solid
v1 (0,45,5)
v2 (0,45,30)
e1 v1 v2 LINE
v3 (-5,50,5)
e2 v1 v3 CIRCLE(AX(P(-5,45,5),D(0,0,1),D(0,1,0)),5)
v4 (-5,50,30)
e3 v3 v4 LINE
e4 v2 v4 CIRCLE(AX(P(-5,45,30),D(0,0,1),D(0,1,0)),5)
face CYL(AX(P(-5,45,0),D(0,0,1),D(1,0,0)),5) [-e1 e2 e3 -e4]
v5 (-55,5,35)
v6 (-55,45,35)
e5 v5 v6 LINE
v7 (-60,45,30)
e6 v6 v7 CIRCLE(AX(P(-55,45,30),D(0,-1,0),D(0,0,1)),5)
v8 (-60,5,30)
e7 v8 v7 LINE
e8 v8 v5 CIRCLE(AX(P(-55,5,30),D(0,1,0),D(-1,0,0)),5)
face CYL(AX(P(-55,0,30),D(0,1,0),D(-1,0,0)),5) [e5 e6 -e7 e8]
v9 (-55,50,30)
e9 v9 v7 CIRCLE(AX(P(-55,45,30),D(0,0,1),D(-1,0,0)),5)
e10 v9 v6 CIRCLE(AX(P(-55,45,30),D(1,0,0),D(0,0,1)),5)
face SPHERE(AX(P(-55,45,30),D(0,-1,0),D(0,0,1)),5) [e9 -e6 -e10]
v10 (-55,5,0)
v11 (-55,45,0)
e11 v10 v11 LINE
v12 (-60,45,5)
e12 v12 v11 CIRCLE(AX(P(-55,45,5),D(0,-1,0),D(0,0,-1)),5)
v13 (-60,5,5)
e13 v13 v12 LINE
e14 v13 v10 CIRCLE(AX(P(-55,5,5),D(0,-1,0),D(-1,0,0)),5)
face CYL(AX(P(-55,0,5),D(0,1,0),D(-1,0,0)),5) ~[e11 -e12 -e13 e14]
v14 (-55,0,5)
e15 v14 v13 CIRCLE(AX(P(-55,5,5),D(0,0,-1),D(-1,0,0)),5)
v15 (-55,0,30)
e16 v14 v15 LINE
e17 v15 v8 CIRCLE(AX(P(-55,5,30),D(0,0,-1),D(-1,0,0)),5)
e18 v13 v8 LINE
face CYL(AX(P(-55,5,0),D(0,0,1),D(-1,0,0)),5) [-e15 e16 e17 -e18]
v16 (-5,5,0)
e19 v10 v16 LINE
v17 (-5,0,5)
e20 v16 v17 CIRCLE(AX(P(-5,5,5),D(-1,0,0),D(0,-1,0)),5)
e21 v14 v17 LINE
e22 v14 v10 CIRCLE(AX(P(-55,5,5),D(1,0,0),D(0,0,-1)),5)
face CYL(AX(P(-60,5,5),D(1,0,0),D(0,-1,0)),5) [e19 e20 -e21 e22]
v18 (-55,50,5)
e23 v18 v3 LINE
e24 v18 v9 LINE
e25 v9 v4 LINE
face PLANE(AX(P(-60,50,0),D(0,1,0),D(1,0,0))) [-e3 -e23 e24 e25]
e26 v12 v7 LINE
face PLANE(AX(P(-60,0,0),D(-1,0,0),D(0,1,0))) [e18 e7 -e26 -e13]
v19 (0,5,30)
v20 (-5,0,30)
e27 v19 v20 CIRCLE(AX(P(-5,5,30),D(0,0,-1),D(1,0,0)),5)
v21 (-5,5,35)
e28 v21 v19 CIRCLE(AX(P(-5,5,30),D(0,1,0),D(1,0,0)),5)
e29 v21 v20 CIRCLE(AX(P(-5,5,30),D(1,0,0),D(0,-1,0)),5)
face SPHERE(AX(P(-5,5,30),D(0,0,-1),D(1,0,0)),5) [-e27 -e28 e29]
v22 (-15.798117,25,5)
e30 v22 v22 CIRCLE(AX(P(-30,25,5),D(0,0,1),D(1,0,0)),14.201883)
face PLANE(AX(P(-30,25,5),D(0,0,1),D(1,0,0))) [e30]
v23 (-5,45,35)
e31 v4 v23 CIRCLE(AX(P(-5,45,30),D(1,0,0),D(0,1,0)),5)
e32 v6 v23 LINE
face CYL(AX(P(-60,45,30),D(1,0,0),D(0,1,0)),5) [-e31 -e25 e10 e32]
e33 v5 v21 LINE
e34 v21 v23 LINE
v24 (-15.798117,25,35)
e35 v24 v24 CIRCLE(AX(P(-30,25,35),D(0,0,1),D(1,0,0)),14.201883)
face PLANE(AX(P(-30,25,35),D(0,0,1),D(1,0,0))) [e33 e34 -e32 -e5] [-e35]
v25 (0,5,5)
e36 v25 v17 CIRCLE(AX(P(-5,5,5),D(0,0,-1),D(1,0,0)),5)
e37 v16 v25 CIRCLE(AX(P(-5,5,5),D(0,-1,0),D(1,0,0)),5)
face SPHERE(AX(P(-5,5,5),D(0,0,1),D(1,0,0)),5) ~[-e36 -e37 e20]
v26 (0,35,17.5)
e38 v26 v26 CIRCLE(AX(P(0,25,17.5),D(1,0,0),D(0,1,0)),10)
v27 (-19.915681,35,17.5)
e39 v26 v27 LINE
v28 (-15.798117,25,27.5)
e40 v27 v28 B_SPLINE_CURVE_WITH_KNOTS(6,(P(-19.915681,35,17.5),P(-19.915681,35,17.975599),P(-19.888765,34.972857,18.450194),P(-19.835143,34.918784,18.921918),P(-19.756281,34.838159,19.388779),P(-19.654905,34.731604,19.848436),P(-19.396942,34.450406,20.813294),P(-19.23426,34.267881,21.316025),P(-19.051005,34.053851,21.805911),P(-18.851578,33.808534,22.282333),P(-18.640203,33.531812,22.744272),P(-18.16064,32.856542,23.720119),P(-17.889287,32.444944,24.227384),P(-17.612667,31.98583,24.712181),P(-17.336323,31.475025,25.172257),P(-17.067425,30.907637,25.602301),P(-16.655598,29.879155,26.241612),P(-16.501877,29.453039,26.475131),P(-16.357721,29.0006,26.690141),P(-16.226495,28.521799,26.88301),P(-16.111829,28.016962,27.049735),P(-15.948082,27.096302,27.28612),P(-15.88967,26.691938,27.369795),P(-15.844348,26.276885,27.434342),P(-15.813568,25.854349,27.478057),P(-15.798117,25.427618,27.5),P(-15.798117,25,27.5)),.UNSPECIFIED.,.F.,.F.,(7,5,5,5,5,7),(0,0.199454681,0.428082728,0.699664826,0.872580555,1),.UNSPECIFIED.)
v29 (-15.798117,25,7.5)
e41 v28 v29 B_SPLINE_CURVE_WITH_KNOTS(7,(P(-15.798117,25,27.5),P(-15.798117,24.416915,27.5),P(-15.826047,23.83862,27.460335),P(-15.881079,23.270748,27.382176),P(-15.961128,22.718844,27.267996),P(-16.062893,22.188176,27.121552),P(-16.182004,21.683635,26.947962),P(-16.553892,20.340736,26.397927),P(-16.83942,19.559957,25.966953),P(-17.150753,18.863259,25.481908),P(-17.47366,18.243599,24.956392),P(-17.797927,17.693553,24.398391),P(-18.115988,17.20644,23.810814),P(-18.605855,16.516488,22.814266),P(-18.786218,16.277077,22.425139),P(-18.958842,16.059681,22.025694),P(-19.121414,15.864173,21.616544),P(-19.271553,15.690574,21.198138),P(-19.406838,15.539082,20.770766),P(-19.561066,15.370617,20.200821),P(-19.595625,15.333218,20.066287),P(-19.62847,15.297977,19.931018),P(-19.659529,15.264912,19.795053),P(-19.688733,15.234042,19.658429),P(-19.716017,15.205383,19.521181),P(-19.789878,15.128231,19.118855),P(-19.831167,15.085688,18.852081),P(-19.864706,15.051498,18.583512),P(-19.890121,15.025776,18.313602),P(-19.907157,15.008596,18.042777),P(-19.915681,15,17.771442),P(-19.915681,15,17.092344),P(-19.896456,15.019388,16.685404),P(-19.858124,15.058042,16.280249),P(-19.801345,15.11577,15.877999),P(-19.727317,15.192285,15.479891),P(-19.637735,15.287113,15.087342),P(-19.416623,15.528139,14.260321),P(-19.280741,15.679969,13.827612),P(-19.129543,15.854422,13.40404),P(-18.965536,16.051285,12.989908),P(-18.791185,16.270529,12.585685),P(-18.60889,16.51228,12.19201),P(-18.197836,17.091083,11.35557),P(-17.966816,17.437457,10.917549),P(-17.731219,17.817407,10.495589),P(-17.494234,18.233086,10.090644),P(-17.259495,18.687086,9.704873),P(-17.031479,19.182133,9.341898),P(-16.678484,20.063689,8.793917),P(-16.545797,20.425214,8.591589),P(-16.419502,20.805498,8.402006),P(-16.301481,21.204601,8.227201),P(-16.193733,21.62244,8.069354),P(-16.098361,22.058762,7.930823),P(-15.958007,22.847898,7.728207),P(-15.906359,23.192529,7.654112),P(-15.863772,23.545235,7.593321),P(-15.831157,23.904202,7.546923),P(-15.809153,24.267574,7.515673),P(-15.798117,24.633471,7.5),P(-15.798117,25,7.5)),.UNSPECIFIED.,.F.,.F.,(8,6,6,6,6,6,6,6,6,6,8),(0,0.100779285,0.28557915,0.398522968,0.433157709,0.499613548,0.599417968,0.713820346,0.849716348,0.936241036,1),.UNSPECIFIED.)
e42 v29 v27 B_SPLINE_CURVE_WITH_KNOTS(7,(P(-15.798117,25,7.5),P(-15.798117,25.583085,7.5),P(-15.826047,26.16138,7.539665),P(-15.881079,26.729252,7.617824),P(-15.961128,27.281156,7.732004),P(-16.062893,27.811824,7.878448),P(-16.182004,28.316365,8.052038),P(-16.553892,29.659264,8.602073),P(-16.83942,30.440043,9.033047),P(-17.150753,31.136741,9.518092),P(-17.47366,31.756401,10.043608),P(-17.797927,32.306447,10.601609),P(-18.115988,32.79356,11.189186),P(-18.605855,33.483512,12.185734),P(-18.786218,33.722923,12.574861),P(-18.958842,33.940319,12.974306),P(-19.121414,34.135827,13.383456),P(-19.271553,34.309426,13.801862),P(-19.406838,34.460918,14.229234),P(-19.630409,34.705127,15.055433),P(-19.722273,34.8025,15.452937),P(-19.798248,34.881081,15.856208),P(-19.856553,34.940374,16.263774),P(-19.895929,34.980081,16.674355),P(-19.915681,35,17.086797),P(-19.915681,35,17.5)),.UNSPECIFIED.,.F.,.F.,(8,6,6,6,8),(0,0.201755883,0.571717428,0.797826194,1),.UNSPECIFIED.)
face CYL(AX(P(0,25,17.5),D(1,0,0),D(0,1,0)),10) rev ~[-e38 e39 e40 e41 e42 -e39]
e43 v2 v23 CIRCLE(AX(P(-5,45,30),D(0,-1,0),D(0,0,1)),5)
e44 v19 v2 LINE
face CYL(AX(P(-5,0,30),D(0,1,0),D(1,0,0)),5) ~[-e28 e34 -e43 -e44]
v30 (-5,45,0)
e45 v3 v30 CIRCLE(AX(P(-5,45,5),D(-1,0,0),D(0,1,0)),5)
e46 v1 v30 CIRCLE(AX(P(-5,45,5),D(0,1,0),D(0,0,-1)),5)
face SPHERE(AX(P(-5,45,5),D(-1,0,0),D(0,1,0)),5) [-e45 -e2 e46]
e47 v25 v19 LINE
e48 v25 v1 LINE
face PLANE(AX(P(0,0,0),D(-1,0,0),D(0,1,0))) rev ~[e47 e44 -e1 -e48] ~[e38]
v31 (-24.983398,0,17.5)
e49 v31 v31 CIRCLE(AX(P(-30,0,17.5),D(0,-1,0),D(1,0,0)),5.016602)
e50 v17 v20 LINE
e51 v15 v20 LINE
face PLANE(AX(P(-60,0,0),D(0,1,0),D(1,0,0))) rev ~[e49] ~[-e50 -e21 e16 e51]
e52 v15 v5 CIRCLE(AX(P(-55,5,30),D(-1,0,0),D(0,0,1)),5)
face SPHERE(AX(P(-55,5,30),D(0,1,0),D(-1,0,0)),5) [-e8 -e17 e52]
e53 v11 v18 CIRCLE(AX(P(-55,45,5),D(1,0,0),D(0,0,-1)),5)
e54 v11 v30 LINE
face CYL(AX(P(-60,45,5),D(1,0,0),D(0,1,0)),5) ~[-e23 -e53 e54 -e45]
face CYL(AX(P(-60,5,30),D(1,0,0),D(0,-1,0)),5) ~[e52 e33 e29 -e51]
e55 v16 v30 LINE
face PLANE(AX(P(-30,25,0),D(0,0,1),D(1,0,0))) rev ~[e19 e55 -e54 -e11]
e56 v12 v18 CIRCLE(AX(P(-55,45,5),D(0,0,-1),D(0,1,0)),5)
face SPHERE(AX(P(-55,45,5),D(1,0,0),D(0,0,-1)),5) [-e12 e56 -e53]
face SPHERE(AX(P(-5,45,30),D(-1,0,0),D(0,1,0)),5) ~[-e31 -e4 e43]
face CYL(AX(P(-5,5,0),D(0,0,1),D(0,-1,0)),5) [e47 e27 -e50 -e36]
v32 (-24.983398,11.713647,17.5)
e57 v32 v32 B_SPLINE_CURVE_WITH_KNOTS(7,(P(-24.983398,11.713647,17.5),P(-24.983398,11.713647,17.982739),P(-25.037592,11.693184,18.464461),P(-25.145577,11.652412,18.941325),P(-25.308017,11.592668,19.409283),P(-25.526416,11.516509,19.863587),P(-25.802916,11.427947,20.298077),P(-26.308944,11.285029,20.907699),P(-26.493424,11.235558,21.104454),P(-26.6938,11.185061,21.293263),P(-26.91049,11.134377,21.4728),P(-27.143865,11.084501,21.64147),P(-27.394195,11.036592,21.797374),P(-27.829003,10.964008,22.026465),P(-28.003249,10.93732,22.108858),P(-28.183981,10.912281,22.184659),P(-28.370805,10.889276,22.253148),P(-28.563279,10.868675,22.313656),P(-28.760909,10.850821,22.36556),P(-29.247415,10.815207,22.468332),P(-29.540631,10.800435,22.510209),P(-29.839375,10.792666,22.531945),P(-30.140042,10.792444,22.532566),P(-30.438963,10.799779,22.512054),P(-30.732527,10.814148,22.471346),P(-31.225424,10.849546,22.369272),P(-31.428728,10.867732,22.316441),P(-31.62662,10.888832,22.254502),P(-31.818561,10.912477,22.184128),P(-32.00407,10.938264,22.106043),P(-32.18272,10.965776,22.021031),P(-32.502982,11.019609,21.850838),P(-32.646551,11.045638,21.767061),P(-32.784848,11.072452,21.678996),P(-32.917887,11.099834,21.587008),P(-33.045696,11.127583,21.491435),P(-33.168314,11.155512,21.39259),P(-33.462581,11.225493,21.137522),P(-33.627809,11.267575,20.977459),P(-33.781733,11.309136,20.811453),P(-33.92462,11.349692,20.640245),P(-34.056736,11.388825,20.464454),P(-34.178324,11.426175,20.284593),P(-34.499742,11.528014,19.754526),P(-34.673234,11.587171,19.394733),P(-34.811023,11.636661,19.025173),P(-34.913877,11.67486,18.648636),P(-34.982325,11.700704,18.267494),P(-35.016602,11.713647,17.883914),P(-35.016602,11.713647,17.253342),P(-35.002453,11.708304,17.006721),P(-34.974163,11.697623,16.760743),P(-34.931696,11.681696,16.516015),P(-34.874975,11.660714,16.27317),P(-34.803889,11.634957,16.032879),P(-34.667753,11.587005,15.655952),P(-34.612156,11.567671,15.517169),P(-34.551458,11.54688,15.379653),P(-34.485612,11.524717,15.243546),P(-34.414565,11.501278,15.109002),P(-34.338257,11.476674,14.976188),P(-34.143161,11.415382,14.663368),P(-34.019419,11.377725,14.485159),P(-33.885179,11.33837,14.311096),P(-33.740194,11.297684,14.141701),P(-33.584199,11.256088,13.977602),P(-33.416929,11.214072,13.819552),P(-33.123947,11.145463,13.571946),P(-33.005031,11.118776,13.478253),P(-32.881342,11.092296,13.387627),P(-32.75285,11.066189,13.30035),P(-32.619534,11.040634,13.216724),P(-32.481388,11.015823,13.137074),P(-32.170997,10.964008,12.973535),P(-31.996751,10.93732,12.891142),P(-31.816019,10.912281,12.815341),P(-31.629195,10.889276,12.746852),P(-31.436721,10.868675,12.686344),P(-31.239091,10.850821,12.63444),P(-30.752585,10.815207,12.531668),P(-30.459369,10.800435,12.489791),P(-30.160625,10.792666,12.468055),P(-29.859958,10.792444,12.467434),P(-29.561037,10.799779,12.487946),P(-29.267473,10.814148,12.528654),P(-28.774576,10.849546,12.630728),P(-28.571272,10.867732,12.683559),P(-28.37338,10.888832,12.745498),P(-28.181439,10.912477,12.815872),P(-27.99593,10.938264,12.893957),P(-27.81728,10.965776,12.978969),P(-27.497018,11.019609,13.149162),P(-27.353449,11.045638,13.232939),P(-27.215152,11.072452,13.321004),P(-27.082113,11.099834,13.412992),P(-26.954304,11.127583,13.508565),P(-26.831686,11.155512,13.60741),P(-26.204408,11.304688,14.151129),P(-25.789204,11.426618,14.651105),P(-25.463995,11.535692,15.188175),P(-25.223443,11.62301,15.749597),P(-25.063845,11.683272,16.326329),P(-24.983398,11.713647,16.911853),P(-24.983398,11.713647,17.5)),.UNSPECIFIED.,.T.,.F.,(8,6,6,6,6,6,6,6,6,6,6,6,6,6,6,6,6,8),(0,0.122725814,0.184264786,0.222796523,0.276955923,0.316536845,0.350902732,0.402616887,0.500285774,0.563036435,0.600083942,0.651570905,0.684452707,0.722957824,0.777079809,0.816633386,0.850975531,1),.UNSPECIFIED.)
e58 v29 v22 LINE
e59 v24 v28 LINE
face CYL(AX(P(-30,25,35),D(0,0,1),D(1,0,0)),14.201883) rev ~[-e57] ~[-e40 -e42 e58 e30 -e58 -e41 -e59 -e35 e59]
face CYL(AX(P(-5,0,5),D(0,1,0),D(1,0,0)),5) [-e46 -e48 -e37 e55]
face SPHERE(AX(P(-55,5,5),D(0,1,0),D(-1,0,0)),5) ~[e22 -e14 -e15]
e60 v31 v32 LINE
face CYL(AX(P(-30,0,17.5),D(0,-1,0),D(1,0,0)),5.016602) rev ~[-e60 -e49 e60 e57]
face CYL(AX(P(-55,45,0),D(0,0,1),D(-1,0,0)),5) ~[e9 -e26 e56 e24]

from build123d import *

# Parameters (mm, degrees)
F0_W     = 60
F0_H     = 50
F1_DEPTH = 35
F2_R     = 5
F3_R     = 10
F4_DEPTH = 30
F5_R     = 14.2018831862
F6_DEPTH = 30
F7_R     = 5.0166024016
F8_DEPTH = 13.3


# Not quite as in the source:
# - the program builds the solid bodies; features that only make, move or delete a surface that nothing else refers to are left out


with BuildPart() as f1:
    # F0 (on Top) → F1 (new body)
    with BuildSketch(Plane.XY):
        with Locations((-30, 25)):
            Rectangle(F0_W, F0_H)
    extrude(amount=F1_DEPTH)

    # F2
    f2_edges = [f1.edges().sort_by_distance(p)[0] for p in [
        (-60, 25, 35),
        (-30, 50, 35),
        (-30, 50, 0),
        (-60, 25, 0),
        (-60, 0, 17.5),
        (0, 50, 17.5),
        (-60, 50, 17.5),
        (0, 0, 17.5),
        (0, 25, 0),
        (0, 25, 35),
        (-30, 0, 35),
        (-30, 0, 0),
    ]]
    fillet(f2_edges, radius=F2_R)

    # F3 (on face) → F4 (cut)
    with BuildSketch(Plane.YZ):
        with Locations((25, 17.5)):
            Circle(F3_R)
    extrude(amount=-F4_DEPTH, mode=Mode.SUBTRACT)

    # F5 (on face) → F6 (cut)
    with BuildSketch(Plane.XY.offset(35)):
        with Locations((-30, 25)):
            Circle(F5_R)
    extrude(amount=-F6_DEPTH, mode=Mode.SUBTRACT)

    # F7 (on face) → F8 (cut)
    with BuildSketch(Plane.XZ):
        with Locations((-30, 17.5)):
            Circle(F7_R)
    extrude(amount=-F8_DEPTH, mode=Mode.SUBTRACT)


solid = f1.part
